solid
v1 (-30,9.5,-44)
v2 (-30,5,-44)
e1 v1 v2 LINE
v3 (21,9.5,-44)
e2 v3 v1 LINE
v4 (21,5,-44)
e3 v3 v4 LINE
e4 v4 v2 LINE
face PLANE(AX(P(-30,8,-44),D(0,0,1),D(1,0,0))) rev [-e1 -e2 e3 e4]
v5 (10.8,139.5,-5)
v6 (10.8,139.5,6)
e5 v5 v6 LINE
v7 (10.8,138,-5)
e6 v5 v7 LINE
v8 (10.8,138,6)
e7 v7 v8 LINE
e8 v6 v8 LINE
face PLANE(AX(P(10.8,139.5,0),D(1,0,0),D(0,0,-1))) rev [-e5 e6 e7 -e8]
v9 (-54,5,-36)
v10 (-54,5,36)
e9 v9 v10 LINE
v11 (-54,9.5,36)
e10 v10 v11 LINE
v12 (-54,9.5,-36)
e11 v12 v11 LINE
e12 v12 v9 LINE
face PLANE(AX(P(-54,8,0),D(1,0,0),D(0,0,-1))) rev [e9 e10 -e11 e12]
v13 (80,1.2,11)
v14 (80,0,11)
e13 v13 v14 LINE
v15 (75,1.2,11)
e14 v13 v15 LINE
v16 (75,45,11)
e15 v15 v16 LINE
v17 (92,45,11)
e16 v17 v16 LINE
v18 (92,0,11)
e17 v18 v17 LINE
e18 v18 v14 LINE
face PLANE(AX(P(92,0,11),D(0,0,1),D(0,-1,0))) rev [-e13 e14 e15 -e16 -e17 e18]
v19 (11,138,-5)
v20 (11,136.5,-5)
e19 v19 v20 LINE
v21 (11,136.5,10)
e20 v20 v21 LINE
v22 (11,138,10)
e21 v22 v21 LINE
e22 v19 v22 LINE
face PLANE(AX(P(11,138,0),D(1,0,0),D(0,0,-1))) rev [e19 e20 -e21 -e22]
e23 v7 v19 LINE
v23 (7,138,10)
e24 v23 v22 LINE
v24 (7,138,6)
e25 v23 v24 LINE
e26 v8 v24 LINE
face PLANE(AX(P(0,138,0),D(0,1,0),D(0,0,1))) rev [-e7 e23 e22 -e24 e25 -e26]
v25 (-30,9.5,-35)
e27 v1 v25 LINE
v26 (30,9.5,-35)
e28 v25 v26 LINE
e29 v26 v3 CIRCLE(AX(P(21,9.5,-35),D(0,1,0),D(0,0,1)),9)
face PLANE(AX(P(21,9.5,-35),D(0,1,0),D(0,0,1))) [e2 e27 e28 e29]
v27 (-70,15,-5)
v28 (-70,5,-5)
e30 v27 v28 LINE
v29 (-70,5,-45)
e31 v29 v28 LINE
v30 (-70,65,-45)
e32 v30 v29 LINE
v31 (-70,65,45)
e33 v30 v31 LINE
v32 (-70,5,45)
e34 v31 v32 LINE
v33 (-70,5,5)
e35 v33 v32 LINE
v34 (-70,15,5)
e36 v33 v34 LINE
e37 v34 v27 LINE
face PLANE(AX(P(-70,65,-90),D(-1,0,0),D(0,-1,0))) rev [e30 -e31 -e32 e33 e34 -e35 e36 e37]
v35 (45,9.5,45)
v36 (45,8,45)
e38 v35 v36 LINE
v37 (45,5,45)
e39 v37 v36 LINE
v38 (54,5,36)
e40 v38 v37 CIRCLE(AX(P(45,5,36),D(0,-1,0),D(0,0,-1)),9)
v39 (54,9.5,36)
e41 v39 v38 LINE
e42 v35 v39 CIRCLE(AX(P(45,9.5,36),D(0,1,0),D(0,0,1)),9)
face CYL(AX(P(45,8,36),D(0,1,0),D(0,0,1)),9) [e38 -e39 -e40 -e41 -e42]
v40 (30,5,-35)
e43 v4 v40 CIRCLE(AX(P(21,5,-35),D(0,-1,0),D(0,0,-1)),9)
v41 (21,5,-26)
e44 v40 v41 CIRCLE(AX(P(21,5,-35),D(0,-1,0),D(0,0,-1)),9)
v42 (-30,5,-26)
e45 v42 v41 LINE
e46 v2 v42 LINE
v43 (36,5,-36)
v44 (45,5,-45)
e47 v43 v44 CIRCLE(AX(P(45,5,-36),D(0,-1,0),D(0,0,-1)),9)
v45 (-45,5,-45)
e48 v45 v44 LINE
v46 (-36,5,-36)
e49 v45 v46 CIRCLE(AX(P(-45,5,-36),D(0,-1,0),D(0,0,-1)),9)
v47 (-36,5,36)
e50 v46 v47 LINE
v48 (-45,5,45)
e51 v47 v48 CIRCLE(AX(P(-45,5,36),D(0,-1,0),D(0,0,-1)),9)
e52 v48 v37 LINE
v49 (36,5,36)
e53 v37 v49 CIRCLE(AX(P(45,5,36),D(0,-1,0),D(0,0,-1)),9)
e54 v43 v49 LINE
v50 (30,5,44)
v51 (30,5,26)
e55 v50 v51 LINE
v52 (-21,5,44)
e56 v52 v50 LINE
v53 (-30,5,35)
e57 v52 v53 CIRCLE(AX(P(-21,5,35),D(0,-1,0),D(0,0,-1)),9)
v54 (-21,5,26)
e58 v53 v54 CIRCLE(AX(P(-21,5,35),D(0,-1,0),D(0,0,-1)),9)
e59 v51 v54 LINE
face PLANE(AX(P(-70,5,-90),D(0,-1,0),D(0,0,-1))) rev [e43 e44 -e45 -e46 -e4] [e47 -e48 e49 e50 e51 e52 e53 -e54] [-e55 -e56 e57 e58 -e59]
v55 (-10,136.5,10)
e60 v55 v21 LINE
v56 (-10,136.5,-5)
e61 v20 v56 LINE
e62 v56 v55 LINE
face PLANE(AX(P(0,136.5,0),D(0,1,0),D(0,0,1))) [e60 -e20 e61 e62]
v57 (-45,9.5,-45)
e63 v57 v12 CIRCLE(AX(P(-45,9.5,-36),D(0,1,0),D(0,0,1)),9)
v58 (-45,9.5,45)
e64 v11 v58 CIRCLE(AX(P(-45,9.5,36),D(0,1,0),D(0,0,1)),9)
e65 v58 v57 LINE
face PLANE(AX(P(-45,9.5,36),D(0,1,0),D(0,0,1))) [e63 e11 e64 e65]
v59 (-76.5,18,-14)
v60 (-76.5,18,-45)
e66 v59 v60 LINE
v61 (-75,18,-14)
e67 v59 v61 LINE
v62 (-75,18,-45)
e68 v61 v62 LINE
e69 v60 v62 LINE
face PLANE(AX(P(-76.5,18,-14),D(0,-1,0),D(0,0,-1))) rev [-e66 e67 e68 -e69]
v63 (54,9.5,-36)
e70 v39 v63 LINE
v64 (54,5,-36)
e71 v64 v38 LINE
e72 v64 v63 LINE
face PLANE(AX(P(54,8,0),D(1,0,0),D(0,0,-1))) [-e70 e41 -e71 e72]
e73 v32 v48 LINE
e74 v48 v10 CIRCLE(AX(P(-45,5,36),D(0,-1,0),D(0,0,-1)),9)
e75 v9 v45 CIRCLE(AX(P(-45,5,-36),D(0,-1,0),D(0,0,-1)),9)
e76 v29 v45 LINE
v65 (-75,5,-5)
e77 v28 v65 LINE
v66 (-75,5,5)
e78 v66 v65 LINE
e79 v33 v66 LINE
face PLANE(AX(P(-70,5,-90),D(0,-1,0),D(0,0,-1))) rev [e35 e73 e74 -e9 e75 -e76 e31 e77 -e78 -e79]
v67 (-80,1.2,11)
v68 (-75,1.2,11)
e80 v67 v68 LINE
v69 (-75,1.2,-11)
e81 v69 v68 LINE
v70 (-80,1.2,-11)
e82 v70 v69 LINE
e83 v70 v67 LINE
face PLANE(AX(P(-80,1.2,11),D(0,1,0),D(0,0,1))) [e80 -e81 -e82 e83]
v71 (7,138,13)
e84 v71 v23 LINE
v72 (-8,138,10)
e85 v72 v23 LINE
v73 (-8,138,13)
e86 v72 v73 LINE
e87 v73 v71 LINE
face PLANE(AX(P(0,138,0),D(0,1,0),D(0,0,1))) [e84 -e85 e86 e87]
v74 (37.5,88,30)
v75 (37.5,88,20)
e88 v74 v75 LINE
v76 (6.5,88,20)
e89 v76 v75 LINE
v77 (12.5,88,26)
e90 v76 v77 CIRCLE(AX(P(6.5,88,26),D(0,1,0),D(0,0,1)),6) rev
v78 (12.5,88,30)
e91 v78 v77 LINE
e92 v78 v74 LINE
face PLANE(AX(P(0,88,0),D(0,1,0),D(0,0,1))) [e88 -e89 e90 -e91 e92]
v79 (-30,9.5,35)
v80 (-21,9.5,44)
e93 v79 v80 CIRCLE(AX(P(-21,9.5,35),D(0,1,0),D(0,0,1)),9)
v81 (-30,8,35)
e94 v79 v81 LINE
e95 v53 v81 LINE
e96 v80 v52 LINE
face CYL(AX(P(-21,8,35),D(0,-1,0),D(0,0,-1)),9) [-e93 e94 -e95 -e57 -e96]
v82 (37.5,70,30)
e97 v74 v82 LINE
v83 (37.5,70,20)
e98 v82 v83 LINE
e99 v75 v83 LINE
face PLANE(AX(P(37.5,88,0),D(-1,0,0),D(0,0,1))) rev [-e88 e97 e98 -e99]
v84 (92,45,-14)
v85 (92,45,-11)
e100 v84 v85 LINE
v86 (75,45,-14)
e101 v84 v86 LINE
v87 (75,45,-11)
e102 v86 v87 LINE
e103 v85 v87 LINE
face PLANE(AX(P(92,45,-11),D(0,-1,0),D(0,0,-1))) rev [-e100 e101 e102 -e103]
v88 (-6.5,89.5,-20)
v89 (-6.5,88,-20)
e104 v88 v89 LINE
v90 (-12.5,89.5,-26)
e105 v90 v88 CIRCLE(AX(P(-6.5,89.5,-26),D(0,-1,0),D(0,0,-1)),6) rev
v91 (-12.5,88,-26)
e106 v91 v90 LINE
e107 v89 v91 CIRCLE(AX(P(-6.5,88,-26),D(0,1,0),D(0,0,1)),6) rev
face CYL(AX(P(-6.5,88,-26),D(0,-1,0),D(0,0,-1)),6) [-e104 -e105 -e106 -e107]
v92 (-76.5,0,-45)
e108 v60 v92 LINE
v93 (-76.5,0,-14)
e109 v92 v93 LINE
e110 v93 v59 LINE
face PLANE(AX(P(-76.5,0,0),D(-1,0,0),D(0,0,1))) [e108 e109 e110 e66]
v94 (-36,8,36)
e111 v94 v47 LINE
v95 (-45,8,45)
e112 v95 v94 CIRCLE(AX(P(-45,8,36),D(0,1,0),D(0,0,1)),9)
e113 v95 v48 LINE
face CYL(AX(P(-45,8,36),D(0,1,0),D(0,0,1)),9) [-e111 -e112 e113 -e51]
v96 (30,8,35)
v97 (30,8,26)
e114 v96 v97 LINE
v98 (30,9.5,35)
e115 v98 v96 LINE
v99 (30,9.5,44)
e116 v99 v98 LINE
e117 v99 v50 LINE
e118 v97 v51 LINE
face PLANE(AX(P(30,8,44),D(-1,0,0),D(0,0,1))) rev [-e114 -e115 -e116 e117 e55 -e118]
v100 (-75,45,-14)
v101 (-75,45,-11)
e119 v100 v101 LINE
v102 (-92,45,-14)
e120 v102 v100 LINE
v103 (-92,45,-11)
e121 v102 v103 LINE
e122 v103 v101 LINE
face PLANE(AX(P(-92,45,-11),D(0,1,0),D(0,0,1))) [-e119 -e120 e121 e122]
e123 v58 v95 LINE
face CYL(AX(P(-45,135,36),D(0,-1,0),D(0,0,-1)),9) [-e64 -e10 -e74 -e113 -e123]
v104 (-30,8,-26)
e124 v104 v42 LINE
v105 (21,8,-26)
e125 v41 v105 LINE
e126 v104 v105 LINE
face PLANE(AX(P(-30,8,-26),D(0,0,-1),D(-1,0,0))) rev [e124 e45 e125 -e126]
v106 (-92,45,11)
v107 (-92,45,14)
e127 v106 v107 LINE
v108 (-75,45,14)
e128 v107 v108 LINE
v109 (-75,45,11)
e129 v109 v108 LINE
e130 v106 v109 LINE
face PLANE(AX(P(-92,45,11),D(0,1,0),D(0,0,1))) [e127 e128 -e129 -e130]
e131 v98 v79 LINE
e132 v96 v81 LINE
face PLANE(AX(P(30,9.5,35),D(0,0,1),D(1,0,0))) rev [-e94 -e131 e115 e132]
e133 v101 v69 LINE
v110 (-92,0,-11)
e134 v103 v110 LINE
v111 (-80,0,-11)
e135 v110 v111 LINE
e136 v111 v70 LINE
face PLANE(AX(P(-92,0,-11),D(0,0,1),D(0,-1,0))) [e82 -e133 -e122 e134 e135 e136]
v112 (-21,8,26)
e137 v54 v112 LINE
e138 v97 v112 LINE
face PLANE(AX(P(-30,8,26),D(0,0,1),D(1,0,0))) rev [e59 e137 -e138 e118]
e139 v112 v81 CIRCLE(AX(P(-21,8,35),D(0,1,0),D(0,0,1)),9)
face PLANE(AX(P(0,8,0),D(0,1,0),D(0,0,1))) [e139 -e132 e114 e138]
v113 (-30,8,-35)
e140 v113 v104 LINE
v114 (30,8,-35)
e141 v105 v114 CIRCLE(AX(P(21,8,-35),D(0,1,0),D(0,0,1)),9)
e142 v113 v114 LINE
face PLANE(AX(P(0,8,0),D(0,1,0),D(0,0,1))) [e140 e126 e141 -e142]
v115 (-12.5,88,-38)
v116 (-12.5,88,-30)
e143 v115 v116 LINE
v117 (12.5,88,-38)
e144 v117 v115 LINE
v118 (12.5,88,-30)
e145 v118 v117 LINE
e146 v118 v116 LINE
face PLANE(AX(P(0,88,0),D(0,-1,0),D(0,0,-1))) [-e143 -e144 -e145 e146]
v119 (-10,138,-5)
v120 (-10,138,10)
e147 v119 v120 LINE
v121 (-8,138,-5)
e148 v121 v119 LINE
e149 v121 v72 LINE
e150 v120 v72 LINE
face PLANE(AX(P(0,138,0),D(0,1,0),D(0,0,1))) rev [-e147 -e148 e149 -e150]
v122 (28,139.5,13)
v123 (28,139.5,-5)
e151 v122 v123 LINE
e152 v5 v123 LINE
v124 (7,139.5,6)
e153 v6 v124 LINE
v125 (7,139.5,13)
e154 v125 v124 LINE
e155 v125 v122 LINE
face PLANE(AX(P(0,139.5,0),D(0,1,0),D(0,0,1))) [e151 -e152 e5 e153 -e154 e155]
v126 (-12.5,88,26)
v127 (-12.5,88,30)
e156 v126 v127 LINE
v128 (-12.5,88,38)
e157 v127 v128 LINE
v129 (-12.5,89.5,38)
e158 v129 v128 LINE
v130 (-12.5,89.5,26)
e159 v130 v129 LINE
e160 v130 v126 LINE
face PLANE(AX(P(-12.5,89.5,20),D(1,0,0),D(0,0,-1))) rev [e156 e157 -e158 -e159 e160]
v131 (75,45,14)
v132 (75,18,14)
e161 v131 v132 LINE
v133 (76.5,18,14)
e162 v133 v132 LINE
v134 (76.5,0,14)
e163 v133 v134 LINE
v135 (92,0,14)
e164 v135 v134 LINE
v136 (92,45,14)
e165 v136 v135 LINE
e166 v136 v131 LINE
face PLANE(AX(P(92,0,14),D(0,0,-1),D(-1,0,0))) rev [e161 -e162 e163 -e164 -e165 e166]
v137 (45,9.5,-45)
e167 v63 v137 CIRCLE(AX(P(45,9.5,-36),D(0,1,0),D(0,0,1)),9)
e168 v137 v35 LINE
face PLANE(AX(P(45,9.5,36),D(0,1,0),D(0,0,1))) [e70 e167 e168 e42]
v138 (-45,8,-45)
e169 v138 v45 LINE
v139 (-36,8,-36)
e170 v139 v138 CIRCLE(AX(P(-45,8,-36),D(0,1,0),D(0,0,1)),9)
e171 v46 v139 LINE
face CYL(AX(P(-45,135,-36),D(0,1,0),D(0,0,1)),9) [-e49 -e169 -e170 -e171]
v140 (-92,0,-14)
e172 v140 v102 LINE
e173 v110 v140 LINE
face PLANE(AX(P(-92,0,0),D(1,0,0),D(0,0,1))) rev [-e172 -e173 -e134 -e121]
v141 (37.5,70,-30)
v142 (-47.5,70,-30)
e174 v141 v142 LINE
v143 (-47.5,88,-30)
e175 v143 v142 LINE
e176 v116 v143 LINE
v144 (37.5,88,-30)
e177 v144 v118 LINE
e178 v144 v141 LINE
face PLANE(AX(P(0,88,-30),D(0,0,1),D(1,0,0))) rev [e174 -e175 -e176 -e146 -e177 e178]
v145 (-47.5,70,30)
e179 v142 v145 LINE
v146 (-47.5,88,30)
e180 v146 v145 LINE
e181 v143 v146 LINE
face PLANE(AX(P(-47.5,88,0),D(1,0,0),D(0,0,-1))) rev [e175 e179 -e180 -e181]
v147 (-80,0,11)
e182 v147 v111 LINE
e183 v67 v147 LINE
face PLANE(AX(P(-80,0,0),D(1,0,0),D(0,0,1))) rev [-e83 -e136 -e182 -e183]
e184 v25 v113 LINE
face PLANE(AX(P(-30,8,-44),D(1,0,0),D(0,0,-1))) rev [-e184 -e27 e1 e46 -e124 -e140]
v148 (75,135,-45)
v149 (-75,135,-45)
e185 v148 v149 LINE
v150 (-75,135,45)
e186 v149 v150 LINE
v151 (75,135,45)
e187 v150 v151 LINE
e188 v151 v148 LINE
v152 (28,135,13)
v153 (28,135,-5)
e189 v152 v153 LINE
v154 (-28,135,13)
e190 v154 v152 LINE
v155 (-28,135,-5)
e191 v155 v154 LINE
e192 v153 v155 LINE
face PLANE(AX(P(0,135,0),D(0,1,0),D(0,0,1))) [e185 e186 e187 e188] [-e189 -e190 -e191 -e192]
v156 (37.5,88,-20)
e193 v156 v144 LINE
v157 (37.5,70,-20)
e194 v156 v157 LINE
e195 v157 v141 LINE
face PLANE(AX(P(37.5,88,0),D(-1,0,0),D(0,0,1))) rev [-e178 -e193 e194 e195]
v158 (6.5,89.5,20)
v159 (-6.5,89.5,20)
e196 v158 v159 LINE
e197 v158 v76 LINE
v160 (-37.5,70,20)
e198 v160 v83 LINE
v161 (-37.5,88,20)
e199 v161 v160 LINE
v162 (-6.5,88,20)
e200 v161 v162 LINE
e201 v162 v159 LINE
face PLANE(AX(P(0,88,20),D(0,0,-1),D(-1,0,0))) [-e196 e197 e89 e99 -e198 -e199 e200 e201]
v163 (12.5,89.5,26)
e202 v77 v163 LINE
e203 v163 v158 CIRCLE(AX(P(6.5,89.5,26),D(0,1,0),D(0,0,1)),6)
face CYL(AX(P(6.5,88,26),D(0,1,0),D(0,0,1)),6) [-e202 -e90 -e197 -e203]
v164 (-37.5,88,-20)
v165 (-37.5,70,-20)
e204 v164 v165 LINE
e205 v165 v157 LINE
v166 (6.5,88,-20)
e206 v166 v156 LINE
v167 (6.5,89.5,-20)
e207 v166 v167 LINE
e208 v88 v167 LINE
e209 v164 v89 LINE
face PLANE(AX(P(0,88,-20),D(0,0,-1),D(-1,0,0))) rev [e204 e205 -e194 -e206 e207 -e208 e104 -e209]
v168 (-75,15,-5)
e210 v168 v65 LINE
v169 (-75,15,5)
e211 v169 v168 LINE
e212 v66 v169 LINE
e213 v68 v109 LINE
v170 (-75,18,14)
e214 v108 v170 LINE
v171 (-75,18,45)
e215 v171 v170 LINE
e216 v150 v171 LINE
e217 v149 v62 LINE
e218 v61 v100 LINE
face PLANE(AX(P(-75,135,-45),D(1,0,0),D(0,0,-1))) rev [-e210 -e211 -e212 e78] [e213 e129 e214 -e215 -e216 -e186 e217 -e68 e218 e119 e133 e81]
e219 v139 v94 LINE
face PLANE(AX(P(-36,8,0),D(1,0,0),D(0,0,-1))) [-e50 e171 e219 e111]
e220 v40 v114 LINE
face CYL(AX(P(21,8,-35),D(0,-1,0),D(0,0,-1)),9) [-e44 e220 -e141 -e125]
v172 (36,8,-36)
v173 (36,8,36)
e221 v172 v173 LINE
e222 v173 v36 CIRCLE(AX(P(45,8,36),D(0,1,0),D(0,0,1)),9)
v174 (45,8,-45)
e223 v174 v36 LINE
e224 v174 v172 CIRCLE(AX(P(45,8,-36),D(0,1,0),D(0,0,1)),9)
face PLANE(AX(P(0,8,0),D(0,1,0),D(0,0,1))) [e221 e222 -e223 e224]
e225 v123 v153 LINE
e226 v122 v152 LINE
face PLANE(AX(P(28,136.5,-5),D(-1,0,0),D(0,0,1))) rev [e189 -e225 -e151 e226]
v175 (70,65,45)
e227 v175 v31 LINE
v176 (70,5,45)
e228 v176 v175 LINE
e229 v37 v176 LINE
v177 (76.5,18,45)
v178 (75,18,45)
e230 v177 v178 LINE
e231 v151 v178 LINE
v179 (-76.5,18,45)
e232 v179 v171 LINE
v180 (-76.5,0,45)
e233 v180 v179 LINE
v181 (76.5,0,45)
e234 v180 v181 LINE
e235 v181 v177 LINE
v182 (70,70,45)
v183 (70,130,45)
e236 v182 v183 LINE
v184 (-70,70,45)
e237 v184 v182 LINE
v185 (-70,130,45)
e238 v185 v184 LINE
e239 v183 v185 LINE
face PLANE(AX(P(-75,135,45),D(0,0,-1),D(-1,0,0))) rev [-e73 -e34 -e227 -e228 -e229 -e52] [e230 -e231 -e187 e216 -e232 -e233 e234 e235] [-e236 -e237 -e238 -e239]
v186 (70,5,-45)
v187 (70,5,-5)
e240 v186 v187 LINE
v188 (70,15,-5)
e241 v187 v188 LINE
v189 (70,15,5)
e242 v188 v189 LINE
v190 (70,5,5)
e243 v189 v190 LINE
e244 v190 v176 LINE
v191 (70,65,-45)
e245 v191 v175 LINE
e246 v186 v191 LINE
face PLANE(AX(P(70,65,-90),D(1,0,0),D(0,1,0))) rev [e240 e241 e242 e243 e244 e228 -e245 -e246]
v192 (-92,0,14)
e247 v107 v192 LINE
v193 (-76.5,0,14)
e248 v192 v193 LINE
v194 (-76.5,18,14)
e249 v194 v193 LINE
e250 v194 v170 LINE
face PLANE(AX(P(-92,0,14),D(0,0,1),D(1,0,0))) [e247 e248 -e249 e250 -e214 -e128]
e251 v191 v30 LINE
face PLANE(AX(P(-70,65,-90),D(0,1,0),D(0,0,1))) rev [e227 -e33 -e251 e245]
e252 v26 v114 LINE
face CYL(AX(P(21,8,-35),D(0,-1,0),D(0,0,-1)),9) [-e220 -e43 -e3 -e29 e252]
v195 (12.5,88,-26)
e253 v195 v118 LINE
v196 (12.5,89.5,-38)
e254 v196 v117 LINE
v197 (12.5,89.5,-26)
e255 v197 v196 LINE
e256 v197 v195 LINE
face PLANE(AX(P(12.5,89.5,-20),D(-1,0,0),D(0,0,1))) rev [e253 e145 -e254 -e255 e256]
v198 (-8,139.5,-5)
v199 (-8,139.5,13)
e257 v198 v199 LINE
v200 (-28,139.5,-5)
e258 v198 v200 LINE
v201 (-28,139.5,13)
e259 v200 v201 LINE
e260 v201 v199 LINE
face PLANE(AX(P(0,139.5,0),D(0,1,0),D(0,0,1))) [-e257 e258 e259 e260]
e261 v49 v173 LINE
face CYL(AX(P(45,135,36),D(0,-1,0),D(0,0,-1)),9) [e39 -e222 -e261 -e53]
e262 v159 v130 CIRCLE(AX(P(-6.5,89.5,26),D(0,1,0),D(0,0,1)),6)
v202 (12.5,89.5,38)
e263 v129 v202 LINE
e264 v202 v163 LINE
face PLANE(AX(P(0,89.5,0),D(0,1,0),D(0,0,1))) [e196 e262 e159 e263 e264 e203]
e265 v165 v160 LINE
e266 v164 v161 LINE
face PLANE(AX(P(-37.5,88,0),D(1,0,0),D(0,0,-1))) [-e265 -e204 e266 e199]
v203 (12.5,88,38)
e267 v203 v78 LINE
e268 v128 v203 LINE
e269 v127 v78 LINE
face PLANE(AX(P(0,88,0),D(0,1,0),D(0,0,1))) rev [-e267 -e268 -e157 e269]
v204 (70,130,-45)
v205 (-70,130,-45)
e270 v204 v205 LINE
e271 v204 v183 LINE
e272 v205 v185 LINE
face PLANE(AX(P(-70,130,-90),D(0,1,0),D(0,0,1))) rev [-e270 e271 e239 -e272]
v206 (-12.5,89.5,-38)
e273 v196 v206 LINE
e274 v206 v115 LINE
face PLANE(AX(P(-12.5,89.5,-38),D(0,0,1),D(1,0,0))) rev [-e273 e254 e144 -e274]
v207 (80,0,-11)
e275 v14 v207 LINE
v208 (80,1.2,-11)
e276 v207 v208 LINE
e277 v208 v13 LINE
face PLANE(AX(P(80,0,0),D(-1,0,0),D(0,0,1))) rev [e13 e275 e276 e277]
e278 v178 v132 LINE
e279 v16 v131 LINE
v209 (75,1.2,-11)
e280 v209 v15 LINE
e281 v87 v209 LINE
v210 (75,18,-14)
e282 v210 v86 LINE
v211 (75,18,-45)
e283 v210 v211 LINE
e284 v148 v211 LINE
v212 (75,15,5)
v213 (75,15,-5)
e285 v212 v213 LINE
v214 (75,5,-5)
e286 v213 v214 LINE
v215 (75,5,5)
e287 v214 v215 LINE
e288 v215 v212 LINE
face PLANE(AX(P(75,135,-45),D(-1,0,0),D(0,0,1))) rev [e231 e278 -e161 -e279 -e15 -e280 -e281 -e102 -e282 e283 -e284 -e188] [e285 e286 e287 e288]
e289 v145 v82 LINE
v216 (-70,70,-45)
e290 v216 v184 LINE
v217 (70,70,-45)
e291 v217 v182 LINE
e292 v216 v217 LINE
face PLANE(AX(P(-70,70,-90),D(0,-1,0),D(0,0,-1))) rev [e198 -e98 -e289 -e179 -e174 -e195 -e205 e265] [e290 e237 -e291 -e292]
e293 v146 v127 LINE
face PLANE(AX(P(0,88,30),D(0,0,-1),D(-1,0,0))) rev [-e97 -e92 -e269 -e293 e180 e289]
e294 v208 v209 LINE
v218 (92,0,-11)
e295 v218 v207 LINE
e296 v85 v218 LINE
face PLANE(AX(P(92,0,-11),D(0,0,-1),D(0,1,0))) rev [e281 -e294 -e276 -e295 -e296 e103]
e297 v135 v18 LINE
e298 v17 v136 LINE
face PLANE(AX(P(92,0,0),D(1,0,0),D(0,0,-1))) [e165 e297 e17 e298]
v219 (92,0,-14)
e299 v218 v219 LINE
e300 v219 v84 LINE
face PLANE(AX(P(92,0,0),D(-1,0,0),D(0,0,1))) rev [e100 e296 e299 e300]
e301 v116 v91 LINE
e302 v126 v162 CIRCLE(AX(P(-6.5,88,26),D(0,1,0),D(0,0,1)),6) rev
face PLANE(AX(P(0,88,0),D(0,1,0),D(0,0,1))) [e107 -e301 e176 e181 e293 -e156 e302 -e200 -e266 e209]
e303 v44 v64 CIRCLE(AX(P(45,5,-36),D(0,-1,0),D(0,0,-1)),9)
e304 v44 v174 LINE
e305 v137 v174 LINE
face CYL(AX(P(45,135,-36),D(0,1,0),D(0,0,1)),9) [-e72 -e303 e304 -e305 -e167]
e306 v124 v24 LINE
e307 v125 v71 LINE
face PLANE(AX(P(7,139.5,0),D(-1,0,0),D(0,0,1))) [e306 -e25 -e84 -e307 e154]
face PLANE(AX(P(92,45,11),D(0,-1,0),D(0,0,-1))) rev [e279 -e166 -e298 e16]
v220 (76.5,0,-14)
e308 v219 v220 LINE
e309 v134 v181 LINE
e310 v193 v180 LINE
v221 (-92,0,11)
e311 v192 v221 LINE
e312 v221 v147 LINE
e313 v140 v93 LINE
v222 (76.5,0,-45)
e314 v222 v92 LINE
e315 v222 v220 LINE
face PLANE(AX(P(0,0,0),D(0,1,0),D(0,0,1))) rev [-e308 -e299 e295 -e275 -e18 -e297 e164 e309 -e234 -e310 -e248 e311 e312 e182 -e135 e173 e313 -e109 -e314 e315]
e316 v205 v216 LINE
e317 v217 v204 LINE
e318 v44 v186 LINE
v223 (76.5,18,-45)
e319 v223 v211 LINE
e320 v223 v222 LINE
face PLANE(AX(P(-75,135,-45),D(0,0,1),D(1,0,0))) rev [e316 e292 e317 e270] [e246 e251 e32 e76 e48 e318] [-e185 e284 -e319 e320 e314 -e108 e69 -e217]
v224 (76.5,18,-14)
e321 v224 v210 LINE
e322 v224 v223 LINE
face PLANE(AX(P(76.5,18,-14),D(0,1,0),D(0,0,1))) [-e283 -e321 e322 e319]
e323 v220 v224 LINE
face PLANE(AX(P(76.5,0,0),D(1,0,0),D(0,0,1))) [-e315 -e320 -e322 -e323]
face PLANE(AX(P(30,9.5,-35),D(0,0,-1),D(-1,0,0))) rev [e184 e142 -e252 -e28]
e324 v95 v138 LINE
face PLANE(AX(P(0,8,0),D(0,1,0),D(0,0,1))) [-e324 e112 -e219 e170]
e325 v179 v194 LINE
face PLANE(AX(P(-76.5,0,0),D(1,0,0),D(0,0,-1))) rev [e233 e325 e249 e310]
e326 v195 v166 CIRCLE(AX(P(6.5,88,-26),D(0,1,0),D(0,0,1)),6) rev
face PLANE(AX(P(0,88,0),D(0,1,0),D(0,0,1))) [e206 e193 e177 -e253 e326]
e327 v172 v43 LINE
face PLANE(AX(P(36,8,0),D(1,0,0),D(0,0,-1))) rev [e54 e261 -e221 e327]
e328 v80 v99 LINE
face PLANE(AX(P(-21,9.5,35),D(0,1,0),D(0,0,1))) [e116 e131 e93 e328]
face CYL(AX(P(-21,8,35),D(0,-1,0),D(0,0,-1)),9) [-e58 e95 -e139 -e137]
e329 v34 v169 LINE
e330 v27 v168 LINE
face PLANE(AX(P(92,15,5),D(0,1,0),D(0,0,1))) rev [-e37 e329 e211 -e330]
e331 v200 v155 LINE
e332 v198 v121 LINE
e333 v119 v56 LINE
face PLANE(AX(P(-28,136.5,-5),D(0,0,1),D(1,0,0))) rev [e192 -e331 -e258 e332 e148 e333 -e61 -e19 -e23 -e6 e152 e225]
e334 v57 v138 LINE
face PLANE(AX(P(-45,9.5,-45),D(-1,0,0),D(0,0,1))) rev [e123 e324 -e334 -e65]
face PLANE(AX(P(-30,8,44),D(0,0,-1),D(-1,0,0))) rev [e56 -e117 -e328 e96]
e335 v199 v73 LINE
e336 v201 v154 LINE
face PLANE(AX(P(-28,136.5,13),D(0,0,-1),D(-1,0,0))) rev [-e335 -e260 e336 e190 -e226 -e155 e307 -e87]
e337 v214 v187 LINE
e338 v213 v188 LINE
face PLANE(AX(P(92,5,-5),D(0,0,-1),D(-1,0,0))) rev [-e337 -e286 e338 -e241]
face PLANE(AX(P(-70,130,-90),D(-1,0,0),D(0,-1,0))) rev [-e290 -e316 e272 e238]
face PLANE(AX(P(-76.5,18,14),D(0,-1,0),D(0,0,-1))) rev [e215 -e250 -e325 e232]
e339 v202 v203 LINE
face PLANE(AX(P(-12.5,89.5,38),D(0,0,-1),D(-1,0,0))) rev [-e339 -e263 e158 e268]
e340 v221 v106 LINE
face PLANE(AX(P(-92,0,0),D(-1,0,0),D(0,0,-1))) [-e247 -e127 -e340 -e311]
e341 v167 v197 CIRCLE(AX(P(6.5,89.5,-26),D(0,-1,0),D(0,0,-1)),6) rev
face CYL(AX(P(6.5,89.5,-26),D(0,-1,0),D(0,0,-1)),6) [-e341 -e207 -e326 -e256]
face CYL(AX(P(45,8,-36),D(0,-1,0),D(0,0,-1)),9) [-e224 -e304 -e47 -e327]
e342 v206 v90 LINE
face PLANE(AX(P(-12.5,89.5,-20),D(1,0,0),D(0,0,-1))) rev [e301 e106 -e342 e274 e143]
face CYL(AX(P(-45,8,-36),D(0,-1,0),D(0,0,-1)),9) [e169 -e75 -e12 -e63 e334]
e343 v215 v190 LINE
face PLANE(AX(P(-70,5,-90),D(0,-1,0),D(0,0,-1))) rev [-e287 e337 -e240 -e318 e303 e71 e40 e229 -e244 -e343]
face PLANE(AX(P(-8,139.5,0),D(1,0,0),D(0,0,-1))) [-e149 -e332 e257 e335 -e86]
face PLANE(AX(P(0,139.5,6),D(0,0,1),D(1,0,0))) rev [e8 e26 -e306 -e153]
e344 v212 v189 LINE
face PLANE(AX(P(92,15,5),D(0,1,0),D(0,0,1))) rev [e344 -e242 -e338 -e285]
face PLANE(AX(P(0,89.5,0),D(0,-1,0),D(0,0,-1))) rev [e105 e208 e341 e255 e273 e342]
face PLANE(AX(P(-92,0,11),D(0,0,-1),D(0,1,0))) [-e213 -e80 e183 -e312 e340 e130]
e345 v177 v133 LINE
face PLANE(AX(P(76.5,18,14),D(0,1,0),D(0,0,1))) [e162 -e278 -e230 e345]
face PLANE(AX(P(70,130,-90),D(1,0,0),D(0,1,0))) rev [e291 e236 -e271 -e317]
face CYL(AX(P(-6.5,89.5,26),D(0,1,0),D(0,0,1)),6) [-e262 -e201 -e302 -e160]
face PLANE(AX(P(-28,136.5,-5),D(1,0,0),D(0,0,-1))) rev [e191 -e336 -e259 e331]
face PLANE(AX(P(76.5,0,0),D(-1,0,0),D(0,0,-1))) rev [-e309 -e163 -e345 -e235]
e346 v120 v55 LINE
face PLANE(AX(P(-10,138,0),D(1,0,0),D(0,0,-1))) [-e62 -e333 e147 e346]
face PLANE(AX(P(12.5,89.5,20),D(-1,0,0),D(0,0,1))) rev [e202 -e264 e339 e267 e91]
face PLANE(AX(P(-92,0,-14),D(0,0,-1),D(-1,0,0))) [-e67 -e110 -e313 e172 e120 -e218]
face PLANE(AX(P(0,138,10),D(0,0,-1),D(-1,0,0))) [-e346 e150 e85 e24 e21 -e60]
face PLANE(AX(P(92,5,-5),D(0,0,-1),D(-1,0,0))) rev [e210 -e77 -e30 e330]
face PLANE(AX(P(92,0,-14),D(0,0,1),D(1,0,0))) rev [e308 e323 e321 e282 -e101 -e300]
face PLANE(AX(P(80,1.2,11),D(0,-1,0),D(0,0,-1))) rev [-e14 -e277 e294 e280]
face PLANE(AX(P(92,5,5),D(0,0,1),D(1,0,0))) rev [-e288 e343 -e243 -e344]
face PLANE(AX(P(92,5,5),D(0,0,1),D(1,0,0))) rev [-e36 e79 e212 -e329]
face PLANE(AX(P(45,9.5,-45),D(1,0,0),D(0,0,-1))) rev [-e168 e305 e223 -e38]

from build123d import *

# Parameters (mm, degrees)
SKETCH1_W            = 150
SKETCH1_H            = 90
BOSS_EXTRUDE1_DEPTH  = 135
SKETCH2_W            = 140
SKETCH2_H            = 60
CUT_EXTRUDE1_DEPTH   = 135
SKETCH3_W            = 3
SKETCH3_H            = 45
BOSS_EXTRUDE2_DEPTH  = 17
SKETCH4_W            = 22
SKETCH4_H            = 5
BOSS_EXTRUDE3_DEPTH  = 7
MIRROR2_OUTLINE_W    = 7
MIRROR2_OUTLINE_H    = 22
MIRROR2_DEPTH        = 5
SKETCH5_W            = 10
SKETCH5_H            = 10
CUT_EXTRUDE3_DEPTH   = 220.406016326
SKETCH6_W            = 56
SKETCH6_H            = 18
BOSS_EXTRUDE4_DEPTH  = 1.5
SKETCH7_W            = 18
SKETCH7_H            = 90
BOSS_EXTRUDE5_DEPTH  = 3
FILLET1_R            = 9
BOSS_EXTRUDE6_DEPTH  = 1.5
SKETCH11_W           = 60
SKETCH11_H           = 18
BOSS_EXTRUDE7_DEPTH  = 3
FILLET2_R            = 9
BOSS_EXTRUDE8_DEPTH  = 1.5
BOSS_EXTRUDE9_DEPTH  = 18
SKETCH15_W           = 25
SKETCH15_H           = 18
BOSS_EXTRUDE10_DEPTH = 1.5
FILLET3_R            = 6
SKETCH16_W           = 21
SKETCH16_H           = 3
BOSS_EXTRUDE11_DEPTH = 1.5
SKETCH17_W           = 3.8
SKETCH17_H           = 4
SKETCH17_H_2         = 3
SKETCH17_W_2         = 2
SKETCH17_H_3         = 15
BOSS_EXTRUDE13_DEPTH = 1.5
SKETCH18_W           = 31
SKETCH18_H           = 18
BOSS_EXTRUDE14_DEPTH = 1.5
SKETCH19_W           = 22
SKETCH19_H           = 5
CUT_EXTRUDE4_DEPTH   = 14
SKETCH20_W           = 22
SKETCH20_H           = 5
CUT_EXTRUDE5_DEPTH   = 7
SKETCH21_W           = 22
SKETCH21_H           = 1.2
BOSS_EXTRUDE15_DEPTH = 5


# Read off the part's stored shape, not the designer's step: Mirror2
with BuildPart() as part:
    # Sketch1 → Boss-Extrude1 (new body)
    with BuildSketch(Plane(origin=(0, 0, 0), x_dir=(1, 0, 0), z_dir=(0, 1, 0))):
        Rectangle(SKETCH1_W, SKETCH1_H)
    extrude(amount=BOSS_EXTRUDE1_DEPTH)

    # Sketch2 → Cut-Extrude1 (cut)
    with BuildSketch(Plane.XY.offset(45)):
        with Locations((0, 35)):
            Rectangle(SKETCH2_W, SKETCH2_H)
        with Locations((0, 100)):
            Rectangle(SKETCH2_W, SKETCH2_H)
    extrude(amount=-CUT_EXTRUDE1_DEPTH, mode=Mode.SUBTRACT)

    # Sketch3 → Boss-Extrude2 (add)
    with BuildSketch(Plane(origin=(75, 0, 0), x_dir=(0, 0, -1), z_dir=(1, 0, 0))):
        with Locations((12.5, 22.5)):
            Rectangle(SKETCH3_W, SKETCH3_H)
        with Locations((-12.5, 22.5)):
            Rectangle(SKETCH3_W, SKETCH3_H)
    boss_extrude2 = extrude(amount=BOSS_EXTRUDE2_DEPTH)

    # Mirror1: Boss-Extrude2 across plane
    add(boss_extrude2.mirror(Plane(origin=(0, 0, 0), x_dir=(0, 0, 1), z_dir=(1, 0, 0))))

    # Sketch4 → Boss-Extrude3 (add)
    with BuildSketch(Plane.ZY.offset(75)):
        with Locations((0, 2.5)):
            Rectangle(SKETCH4_W, SKETCH4_H)
    extrude(amount=BOSS_EXTRUDE3_DEPTH)

    # Mirror2 outline → Mirror2 (add)
    with BuildSketch(Plane(origin=(0, 0, 0), x_dir=(1, 0, 0), z_dir=(0, 1, 0))):
        with Locations((-85.5, 0)):
            Rectangle(MIRROR2_OUTLINE_W, MIRROR2_OUTLINE_H)
        with Locations((78.5, 0)):
            Rectangle(MIRROR2_OUTLINE_W, MIRROR2_OUTLINE_H)
    extrude(amount=MIRROR2_DEPTH)

    # Sketch5 → Cut-Extrude3 (cut, through all)
    with BuildSketch(Plane.ZY.offset(75)):
        with Locations((0, 10)):
            Rectangle(SKETCH5_W, SKETCH5_H)
    extrude(amount=-CUT_EXTRUDE3_DEPTH, mode=Mode.SUBTRACT)

    # Sketch6 → Boss-Extrude4 (add)
    with BuildSketch(Plane(origin=(0, 135, 0), x_dir=(1, 0, 0), z_dir=(0, 1, 0))):
        with Locations((0, -4)):
            Rectangle(SKETCH6_W, SKETCH6_H)
    extrude(amount=BOSS_EXTRUDE4_DEPTH)

    # Sketch7 → Boss-Extrude5 (add)
    with BuildSketch(Plane(origin=(0, 5, 0), x_dir=(1, 0, 0), z_dir=(0, 1, 0))):
        with Locations((45, 0)):
            Rectangle(SKETCH7_W, SKETCH7_H)
        with Locations((-45, 0)):
            Rectangle(SKETCH7_W, SKETCH7_H)
    extrude(amount=BOSS_EXTRUDE5_DEPTH)

    # Fillet1
    fillet1_edges = [part.edges().sort_by_distance(p)[0] for p in [
        (36, 6.5, 45),
        (54, 6.5, 45),
        (-36, 6.5, 45),
        (-54, 6.5, 45),
        (-54, 6.5, -45),
        (-36, 6.5, -45),
        (54, 6.5, -45),
        (36, 6.5, -45),
    ]]
    fillet(fillet1_edges, radius=FILLET1_R - 0.0001)  # a hair under: the kernel refuses the full size

    # Sketch10 → Boss-Extrude6 (add)
    with BuildSketch(Plane(origin=(0, 8, 0), x_dir=(1, 0, 0), z_dir=(0, 1, 0))):
        with BuildLine():
            Line((-45, 45), (-45, -45))
            ThreePointArc((-45, -45), (-51.363961031, -42.363961031), (-54, -36))
            Line((-54, -36), (-54, 36))
            ThreePointArc((-54, 36), (-51.363961031, 42.363961031), (-45, 45))
        make_face()
        with BuildLine():
            Line((45, 45), (45, -45))
            ThreePointArc((45, -45), (51.363961031, -42.363961031), (54, -36))
            Line((54, -36), (54, 36))
            ThreePointArc((54, 36), (51.363961031, 42.363961031), (45, 45))
        make_face()
    extrude(amount=BOSS_EXTRUDE6_DEPTH)

    # Sketch11 → Boss-Extrude7 (add)
    with BuildSketch(Plane(origin=(0, 5, 0), x_dir=(1, 0, 0), z_dir=(0, 1, 0))):
        with Locations((0, 35)):
            Rectangle(SKETCH11_W, SKETCH11_H)
        with Locations((0, -35)):
            Rectangle(SKETCH11_W, SKETCH11_H)
    extrude(amount=BOSS_EXTRUDE7_DEPTH)

    # Fillet2
    fillet2_edges = [part.edges().sort_by_distance(p)[0] for p in [
        (30, 6.5, -26),
        (30, 6.5, -44),
        (-30, 6.5, 26),
        (-30, 6.5, 44),
    ]]
    fillet(fillet2_edges, radius=FILLET2_R - 0.0001)  # a hair under: the kernel refuses the full size

    # Sketch13 → Boss-Extrude8 (add)
    with BuildSketch(Plane(origin=(0, 8, 0), x_dir=(1, 0, 0), z_dir=(0, 1, 0))):
        with BuildLine():
            Line((21, 44), (-30, 44))
            Line((-30, 44), (-30, 35))
            Line((-30, 35), (30, 35))
            ThreePointArc((30, 35), (27.363961031, 41.363961031), (21, 44))
        make_face()
        with BuildLine():
            Line((-21, -44), (30, -44))
            Line((30, -44), (30, -35))
            Line((30, -35), (-30, -35))
            ThreePointArc((-30, -35), (-27.363961031, -41.363961031), (-21, -44))
        make_face()
    extrude(amount=BOSS_EXTRUDE8_DEPTH)

    # Sketch14 → Boss-Extrude9 (add)
    with BuildSketch(Plane(origin=(0, 70, 0), x_dir=(1, 0, 0), z_dir=(0, 1, 0))):
        Polygon((-47.5, -30), (37.5, -30), (37.5, -20), (-37.5, -20), (-37.5, 20), (37.5, 20), (37.5, 30), (-47.5, 30), align=None)
    extrude(amount=BOSS_EXTRUDE9_DEPTH)

    # Sketch15 → Boss-Extrude10 (add)
    with BuildSketch(Plane(origin=(0, 88, 0), x_dir=(1, 0, 0), z_dir=(0, 1, 0))):
        with Locations((0, -29)):
            Rectangle(SKETCH15_W, SKETCH15_H)
        with Locations((0, 29)):
            Rectangle(SKETCH15_W, SKETCH15_H)
    extrude(amount=BOSS_EXTRUDE10_DEPTH)

    # Fillet3
    fillet3_edges = [part.edges().sort_by_distance(p)[0] for p in [
        (-12.5, 88.75, 20),
        (12.5, 88.75, 20),
        (-12.5, 88.75, -20),
        (12.5, 88.75, -20),
    ]]
    fillet(fillet3_edges, radius=FILLET3_R)

    # Sketch16 → Boss-Extrude11 (add)
    with BuildSketch(Plane(origin=(0, 136.5, 0), x_dir=(1, 0, 0), z_dir=(0, 1, 0))):
        Polygon((-10, 5), (-28, 5), (-28, -13), (-10, -13), (-10, -10), align=None)
        with Locations((0.5, -11.5)):
            Rectangle(SKETCH16_W, SKETCH16_H)
        Polygon((28, 5), (11, 5), (11, -10), (11, -13), (28, -13), align=None)
    extrude(amount=BOSS_EXTRUDE11_DEPTH)

    # Sketch17 → Boss-Extrude13 (add)
    with BuildSketch(Plane(origin=(0, 138, 0), x_dir=(1, 0, 0), z_dir=(0, 1, 0))):
        Polygon((10.8, -6), (10.8, -10), (11, -10), (11, 5), (10.8, 5), align=None)
        Polygon((10.8, -10), (10.8, -13), (28, -13), (28, 5), (11, 5), (11, -10), align=None)
        with Locations((8.9, -8)):
            Rectangle(SKETCH17_W, SKETCH17_H)
        with Locations((8.9, -11.5)):
            Rectangle(SKETCH17_W, SKETCH17_H_2)
        Polygon((-10, 5), (-28, 5), (-28, -13), (-8, -13), (-8, -10), (-10, -10), align=None)
        with Locations((-9, -2.5)):
            Rectangle(SKETCH17_W_2, SKETCH17_H_3)
    extrude(amount=BOSS_EXTRUDE13_DEPTH)

    # Sketch18 → Boss-Extrude14 (add)
    with BuildSketch(Plane.ZY.offset(75)):
        with Locations((29.5, 9)):
            Rectangle(SKETCH18_W, SKETCH18_H)
        with Locations((-29.5, 9)):
            Rectangle(SKETCH18_W, SKETCH18_H)
    boss_extrude14 = extrude(amount=BOSS_EXTRUDE14_DEPTH)

    # Mirror3: Boss-Extrude14 across plane
    add(boss_extrude14.mirror(Plane(origin=(0, 0, 0), x_dir=(0, 0, 1), z_dir=(1, 0, 0))))

    # Sketch19 → Cut-Extrude4 (cut)
    with BuildSketch(Plane.ZY.offset(89)):
        with Locations((0, 2.5)):
            Rectangle(SKETCH19_W, SKETCH19_H)
    extrude(amount=-CUT_EXTRUDE4_DEPTH, mode=Mode.SUBTRACT)

    # Sketch20 → Cut-Extrude5 (cut)
    with BuildSketch(Plane(origin=(82, 0, 0), x_dir=(0, 0, -1), z_dir=(1, 0, 0))):
        with Locations((0, 2.5)):
            Rectangle(SKETCH20_W, SKETCH20_H)
    extrude(amount=-CUT_EXTRUDE5_DEPTH, mode=Mode.SUBTRACT)

    # Sketch21 → Boss-Extrude15 (add)
    with BuildSketch(Plane(origin=(75, 0, 0), x_dir=(0, 0, -1), z_dir=(1, 0, 0))):
        with Locations((0, 0.6)):
            Rectangle(SKETCH21_W, SKETCH21_H)
    boss_extrude15 = extrude(amount=BOSS_EXTRUDE15_DEPTH)

    # Mirror4: Boss-Extrude15 across plane
    add(boss_extrude15.mirror(Plane(origin=(0, 0, 0), x_dir=(0, 0, 1), z_dir=(1, 0, 0))))


solid = part.part
